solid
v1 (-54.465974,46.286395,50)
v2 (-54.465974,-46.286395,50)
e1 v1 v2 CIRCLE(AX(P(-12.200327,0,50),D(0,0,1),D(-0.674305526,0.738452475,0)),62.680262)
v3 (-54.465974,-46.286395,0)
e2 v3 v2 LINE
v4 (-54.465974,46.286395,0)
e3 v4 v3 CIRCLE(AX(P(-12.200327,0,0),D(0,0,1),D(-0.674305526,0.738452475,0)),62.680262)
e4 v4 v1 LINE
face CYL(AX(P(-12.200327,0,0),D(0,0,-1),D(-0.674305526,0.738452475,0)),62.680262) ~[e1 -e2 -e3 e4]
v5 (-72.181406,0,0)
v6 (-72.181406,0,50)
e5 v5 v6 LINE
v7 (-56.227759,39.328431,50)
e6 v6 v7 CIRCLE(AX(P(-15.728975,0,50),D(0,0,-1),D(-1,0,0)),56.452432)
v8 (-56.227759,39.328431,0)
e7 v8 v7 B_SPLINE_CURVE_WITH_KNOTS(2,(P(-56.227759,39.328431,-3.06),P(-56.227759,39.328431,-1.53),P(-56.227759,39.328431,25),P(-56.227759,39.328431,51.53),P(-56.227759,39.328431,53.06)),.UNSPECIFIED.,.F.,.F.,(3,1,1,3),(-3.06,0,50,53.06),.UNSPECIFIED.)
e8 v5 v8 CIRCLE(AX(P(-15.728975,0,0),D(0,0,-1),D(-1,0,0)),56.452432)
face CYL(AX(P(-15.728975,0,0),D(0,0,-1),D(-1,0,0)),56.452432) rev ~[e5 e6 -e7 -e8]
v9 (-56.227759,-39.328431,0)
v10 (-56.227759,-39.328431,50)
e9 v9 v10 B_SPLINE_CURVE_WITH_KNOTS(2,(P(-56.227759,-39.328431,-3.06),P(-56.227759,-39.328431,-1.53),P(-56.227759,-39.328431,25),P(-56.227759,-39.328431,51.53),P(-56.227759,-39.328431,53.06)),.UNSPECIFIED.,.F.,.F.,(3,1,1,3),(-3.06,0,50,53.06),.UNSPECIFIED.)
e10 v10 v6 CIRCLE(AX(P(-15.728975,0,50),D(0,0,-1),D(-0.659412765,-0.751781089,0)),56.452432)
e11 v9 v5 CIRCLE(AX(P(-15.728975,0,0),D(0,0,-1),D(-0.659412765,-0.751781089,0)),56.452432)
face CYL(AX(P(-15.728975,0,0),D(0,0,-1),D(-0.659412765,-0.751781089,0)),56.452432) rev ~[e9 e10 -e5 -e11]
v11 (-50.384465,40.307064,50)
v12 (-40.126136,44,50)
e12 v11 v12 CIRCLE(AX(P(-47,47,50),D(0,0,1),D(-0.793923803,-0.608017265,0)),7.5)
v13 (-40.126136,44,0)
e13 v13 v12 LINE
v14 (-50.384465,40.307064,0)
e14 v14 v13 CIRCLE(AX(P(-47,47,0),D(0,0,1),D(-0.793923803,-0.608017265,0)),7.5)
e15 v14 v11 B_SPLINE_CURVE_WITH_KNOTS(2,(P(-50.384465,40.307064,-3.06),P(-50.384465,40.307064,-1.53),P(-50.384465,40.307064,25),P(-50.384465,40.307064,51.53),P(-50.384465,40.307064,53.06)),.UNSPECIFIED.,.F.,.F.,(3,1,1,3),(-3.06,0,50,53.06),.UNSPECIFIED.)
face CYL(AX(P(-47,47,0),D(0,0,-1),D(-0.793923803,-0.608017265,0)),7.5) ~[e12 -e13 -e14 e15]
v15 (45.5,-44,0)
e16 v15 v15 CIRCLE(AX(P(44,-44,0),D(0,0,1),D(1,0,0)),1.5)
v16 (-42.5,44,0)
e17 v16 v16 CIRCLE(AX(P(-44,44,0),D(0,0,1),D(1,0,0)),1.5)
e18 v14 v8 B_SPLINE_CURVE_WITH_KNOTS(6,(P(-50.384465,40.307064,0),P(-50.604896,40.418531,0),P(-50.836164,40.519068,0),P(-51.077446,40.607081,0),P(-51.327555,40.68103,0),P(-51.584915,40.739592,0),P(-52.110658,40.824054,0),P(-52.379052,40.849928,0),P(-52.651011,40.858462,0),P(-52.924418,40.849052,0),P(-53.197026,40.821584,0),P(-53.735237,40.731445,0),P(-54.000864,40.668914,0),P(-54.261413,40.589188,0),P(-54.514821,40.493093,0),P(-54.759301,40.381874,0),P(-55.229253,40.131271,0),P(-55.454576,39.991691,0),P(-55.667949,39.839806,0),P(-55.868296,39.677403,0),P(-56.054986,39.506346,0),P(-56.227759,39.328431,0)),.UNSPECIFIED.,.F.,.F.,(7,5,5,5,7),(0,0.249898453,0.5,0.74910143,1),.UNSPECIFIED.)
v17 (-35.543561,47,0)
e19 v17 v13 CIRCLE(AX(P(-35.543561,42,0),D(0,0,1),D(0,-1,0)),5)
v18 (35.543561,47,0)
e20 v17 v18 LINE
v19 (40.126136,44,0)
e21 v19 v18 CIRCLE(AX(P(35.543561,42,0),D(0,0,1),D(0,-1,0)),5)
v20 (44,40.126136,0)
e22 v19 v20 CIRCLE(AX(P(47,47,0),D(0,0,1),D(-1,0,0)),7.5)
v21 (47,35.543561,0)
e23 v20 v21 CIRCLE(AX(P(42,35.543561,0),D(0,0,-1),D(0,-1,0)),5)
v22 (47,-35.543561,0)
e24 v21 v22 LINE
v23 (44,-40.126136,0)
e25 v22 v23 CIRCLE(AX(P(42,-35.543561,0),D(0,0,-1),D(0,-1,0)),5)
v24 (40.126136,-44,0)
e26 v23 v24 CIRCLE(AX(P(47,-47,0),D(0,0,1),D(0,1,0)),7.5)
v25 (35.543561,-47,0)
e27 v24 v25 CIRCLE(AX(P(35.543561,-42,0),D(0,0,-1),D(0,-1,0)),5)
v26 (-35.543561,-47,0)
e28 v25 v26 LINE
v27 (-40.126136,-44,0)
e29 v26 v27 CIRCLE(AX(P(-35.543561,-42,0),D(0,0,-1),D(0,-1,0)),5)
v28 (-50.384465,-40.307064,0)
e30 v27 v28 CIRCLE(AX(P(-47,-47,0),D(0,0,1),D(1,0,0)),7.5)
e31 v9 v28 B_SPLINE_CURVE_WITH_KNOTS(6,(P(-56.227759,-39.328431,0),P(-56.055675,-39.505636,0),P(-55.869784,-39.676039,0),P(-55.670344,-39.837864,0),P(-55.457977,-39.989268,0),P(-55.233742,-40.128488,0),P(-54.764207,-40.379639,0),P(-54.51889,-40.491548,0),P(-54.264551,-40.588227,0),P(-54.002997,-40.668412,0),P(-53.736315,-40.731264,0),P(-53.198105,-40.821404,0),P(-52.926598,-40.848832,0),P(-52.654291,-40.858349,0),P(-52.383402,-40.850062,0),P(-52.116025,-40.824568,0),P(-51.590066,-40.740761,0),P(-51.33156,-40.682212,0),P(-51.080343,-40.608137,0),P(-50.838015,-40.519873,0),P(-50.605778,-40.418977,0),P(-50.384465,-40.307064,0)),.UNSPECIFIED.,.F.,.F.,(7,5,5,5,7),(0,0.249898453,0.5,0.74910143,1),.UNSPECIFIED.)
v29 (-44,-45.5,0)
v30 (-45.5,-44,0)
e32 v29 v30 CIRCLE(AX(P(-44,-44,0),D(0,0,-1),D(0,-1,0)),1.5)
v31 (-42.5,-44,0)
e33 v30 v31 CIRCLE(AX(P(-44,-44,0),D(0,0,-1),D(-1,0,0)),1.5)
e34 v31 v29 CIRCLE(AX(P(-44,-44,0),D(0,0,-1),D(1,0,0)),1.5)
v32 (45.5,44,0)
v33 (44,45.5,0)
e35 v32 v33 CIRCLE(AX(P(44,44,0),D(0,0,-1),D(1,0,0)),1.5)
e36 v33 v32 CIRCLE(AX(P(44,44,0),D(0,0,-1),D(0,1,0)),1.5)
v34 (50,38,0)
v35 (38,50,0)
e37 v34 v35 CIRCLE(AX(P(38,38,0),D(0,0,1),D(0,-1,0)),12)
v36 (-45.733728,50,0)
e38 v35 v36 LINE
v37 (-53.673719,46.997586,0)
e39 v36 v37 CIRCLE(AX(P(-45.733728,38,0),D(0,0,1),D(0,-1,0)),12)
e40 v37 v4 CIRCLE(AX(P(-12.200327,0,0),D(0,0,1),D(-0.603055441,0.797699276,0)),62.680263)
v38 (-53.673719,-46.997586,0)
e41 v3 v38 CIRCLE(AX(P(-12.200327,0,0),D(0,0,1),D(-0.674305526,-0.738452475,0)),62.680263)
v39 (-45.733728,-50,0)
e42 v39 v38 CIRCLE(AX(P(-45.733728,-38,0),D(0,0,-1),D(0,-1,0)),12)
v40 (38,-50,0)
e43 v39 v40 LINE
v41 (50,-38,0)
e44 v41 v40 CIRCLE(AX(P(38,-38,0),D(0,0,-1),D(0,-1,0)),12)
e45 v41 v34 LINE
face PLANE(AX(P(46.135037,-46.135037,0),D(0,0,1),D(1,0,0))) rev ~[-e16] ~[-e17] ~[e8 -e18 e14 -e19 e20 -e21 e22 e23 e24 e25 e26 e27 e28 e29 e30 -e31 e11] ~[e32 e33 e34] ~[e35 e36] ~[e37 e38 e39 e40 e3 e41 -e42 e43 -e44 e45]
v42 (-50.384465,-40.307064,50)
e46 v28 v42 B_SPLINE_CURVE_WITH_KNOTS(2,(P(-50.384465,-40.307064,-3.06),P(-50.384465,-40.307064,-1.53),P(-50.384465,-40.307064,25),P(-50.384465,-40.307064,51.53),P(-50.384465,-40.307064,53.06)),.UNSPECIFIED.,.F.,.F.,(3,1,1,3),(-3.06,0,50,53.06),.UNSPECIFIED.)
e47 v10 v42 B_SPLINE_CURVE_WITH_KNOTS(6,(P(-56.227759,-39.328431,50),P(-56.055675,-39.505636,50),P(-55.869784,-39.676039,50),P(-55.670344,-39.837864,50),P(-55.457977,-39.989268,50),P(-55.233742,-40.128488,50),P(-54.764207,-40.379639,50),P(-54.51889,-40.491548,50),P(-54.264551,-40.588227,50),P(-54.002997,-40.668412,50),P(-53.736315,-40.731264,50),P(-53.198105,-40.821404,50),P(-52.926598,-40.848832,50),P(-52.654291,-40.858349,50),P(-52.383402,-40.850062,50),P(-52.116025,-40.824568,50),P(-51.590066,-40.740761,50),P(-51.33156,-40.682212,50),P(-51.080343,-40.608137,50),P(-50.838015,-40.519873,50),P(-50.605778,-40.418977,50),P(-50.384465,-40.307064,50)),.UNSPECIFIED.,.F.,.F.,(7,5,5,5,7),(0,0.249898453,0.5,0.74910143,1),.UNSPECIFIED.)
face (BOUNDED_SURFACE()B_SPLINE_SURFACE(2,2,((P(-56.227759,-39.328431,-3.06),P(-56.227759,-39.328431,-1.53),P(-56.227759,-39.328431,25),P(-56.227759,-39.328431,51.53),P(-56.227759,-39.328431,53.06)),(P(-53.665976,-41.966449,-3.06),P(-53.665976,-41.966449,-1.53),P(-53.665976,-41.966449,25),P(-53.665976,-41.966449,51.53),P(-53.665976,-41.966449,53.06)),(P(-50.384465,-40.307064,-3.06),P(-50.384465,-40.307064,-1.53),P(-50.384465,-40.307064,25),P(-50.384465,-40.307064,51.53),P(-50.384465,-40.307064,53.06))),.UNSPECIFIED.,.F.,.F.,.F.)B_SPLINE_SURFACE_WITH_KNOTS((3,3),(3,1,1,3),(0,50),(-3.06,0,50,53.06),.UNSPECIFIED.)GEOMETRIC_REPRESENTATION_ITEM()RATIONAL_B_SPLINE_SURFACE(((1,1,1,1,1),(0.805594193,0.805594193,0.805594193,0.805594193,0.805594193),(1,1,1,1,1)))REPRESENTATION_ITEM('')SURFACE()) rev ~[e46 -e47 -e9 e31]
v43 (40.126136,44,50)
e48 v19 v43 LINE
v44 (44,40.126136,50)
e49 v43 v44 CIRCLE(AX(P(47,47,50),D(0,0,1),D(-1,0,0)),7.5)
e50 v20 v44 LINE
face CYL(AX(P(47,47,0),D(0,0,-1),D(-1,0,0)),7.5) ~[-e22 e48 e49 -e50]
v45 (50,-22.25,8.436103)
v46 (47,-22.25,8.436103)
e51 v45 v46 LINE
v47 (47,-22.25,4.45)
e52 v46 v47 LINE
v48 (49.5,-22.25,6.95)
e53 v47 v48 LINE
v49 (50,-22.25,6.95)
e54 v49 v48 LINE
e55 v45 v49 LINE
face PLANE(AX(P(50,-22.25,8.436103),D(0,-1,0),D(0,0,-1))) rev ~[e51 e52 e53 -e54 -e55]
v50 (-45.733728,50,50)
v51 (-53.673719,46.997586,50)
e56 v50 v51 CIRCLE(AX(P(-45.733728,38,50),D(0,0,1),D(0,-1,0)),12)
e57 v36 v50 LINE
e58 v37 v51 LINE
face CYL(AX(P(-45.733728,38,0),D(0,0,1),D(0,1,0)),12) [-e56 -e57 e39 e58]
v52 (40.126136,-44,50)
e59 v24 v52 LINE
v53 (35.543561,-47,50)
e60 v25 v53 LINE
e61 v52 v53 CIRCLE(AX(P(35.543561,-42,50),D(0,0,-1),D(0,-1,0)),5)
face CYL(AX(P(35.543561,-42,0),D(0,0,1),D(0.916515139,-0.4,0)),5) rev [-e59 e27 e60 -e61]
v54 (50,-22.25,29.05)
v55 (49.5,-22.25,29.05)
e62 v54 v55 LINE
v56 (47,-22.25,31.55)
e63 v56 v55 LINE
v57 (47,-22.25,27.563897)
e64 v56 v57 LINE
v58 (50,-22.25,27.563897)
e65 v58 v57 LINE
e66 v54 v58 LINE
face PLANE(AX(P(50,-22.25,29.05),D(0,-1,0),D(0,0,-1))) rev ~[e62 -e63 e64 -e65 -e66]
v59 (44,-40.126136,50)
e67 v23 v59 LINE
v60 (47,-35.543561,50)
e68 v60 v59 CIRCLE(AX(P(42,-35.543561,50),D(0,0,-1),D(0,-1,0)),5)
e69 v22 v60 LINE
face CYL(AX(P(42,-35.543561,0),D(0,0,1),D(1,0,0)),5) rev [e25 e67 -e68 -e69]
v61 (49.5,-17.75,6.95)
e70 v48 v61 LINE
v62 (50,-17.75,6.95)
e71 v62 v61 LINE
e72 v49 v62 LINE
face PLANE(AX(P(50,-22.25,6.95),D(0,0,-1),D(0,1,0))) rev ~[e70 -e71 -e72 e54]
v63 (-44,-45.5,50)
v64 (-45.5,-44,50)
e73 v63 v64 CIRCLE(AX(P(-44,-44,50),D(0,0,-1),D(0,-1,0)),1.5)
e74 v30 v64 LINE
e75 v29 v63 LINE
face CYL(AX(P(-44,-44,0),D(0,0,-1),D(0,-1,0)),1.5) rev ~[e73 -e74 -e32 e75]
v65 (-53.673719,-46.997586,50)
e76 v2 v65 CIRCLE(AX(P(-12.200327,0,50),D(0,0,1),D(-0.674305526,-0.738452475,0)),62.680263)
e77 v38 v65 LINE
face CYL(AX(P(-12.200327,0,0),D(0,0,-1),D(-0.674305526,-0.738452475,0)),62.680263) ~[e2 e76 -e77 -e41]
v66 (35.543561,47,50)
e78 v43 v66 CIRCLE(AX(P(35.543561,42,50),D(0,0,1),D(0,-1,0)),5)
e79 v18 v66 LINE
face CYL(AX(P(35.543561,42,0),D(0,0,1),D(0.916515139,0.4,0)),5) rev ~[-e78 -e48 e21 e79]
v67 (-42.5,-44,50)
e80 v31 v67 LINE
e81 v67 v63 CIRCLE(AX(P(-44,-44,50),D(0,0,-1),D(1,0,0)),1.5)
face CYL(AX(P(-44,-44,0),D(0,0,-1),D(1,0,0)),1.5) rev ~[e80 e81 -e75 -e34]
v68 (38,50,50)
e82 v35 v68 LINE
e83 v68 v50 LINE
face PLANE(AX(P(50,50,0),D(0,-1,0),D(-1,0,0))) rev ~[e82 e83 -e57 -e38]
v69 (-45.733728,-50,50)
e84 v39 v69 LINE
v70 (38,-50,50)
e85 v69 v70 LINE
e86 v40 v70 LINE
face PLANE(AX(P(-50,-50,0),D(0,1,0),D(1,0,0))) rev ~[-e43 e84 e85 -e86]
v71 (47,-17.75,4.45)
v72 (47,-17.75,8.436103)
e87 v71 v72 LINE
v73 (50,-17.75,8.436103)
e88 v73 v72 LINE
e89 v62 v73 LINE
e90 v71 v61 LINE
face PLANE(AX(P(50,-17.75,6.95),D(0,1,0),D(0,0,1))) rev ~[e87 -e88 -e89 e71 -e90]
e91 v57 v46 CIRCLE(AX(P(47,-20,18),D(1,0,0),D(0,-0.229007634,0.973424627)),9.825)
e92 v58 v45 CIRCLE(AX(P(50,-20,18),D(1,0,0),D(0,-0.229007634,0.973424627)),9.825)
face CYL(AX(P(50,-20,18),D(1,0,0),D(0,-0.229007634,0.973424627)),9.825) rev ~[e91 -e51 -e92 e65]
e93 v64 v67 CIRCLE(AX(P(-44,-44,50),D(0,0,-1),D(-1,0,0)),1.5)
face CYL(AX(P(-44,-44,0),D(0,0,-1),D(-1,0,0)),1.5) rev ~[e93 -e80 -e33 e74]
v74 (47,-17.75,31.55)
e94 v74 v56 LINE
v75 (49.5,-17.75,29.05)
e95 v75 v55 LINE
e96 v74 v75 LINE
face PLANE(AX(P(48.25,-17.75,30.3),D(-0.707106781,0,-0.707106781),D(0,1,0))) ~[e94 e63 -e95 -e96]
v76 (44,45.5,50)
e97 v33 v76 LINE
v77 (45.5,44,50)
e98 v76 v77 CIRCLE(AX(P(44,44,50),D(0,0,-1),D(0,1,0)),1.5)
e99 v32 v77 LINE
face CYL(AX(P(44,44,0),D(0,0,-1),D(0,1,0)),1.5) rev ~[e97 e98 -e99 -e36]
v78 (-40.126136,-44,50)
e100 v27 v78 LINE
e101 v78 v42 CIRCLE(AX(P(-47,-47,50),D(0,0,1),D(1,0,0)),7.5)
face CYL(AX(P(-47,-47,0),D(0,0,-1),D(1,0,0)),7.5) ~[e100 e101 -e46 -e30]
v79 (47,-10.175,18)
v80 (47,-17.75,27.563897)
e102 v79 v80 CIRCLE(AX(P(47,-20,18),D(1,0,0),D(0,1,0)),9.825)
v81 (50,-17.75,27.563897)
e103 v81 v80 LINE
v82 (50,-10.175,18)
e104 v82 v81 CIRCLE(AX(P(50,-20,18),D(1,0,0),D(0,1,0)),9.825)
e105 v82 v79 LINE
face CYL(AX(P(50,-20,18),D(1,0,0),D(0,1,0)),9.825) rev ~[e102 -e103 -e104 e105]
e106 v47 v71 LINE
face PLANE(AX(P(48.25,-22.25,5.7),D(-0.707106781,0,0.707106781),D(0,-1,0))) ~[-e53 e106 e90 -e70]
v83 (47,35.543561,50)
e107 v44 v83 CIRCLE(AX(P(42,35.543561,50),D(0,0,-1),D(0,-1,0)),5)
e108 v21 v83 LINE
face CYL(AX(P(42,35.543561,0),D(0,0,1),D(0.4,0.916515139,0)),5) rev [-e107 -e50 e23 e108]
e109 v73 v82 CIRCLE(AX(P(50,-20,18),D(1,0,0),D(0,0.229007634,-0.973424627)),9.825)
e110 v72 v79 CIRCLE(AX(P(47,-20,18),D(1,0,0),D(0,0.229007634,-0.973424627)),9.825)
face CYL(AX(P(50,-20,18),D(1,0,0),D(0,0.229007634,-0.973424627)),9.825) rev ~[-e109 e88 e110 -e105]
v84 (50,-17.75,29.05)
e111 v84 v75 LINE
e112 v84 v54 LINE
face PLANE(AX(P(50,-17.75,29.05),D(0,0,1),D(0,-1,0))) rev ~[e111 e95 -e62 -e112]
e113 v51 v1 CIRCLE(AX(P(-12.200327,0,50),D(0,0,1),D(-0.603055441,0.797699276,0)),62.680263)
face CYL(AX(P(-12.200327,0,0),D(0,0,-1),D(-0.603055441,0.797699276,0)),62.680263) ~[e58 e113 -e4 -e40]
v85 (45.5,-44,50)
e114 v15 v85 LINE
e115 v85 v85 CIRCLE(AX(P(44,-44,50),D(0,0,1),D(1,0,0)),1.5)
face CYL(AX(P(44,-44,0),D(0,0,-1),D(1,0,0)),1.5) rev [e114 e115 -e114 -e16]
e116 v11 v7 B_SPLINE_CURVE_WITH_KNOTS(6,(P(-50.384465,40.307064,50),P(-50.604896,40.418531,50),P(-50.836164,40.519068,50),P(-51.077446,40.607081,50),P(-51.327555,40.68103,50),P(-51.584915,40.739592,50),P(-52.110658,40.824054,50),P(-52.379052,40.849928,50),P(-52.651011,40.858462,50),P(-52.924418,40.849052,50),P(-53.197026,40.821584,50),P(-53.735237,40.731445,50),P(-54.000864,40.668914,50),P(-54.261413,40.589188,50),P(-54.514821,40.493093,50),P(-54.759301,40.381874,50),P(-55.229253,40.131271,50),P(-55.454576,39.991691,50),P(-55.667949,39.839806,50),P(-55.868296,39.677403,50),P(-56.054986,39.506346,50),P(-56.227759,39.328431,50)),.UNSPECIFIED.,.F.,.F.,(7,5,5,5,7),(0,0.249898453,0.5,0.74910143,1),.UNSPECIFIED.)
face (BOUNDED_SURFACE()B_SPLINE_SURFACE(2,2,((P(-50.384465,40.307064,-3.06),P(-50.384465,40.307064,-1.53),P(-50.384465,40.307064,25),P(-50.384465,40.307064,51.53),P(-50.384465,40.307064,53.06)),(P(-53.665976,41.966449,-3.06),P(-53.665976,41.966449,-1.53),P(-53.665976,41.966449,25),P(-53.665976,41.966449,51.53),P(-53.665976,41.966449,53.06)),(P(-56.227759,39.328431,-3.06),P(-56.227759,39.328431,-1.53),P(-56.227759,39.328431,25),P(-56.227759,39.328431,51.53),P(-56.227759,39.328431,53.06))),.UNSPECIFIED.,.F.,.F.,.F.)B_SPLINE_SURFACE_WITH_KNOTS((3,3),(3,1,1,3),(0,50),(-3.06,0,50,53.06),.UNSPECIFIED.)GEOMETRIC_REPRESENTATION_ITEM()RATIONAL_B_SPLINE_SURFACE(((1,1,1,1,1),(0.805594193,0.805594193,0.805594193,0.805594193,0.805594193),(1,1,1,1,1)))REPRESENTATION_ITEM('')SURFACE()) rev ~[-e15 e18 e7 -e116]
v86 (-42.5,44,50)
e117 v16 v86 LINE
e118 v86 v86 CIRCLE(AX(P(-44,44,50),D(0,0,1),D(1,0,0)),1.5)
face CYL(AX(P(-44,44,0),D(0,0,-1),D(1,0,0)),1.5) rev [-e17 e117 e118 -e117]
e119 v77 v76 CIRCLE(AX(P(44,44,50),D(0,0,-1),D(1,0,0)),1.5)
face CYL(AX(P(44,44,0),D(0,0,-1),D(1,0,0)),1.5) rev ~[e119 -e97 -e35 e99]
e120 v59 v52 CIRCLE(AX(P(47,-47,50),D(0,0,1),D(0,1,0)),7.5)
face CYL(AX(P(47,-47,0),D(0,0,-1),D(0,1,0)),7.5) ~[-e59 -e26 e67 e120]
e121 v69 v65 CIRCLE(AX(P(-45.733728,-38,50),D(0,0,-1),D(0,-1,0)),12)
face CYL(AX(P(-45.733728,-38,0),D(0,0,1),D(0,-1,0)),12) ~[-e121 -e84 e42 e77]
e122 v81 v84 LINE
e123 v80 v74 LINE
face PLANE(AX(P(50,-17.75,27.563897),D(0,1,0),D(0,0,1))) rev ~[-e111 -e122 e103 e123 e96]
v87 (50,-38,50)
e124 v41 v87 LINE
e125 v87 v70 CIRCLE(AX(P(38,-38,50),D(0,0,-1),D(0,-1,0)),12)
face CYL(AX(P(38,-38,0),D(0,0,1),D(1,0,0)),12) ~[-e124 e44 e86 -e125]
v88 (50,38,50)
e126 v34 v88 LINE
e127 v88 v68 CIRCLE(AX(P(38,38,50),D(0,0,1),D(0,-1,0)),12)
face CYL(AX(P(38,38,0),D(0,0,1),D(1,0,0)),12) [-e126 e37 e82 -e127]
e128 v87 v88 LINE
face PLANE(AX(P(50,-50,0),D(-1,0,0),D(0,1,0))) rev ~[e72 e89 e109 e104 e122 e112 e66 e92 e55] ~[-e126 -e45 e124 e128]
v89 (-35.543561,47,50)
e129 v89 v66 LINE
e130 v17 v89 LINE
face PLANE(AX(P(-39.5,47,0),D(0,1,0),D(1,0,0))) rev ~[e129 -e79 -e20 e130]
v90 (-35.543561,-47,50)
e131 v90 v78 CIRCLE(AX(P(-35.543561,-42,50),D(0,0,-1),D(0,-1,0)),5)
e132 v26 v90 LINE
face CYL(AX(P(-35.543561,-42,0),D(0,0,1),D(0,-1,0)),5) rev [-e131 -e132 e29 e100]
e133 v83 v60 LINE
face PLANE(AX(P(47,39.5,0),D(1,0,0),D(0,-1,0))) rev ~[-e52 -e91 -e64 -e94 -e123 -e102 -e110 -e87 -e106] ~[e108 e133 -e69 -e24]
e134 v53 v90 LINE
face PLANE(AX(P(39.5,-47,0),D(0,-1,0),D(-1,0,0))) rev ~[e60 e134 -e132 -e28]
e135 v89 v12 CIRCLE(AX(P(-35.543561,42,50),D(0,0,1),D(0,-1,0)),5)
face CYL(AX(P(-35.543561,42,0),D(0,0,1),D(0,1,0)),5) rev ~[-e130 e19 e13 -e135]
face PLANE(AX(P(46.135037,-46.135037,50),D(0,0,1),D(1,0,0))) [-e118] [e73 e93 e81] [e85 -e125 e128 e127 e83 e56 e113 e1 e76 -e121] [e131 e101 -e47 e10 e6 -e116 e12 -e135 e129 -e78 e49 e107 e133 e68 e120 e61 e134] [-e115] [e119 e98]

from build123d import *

# Parameters (mm, degrees)
F0_R     = 1.5
F1_DEPTH = 50
F2_R     = 12
F3_R     = 5
F5_DEPTH = 4
F6_SIZE  = 2.5


with BuildPart() as f1:
    # F0 (on Top) → F1 (new body)
    with BuildSketch(Plane.XY):
        with BuildLine():
            Line((40.1261364576, -50), (50, -50))
            Line((50, -50), (50, -40.1261364576))
            ThreePointArc((50, -40.1261364576), (48.5323223277, -39.658202653), (47, -39.5))
            Line((47, -39.5), (47, -47))
            Line((47, -47), (39.5, -47))
            ThreePointArc((39.5, -47), (39.658202653, -48.5323223277), (40.1261364576, -50))
        make_face()
        with BuildLine():
            Line((-40.1261364576, -50), (40.1261364576, -50))
            ThreePointArc((40.1261364576, -50), (39.658202653, -48.5323223277), (39.5, -47))
            Line((39.5, -47), (-39.5, -47))
            ThreePointArc((-39.5, -47), (-39.658202653, -48.5323223277), (-40.1261364576, -50))
        make_face()
        with BuildLine():
            ThreePointArc((47, -39.5), (48.5323223277, -39.658202653), (50, -40.1261364576))
            Line((50, -40.1261364576), (50, 40.1261364576))
            ThreePointArc((50, 40.1261364576), (48.5323223277, 39.658202653), (47, 39.5))
            Line((47, 39.5), (47, -39.5))
        make_face()
        with BuildLine():
            Line((-50, -50), (-40.1261364576, -50))
            ThreePointArc((-40.1261364576, -50), (-39.658202653, -48.5323223277), (-39.5, -47))
            Line((-39.5, -47), (-44, -47))
            Line((-44, -47), (-47, -47))
            ThreePointArc((-47, -47), (-50.0530276117, -44.8189291928), (-52.9544285232, -42.4398705103))
            ThreePointArc((-52.9544285232, -42.4398705103), (-53.9803824114, -44.2569612852), (-54.4659740059, -46.2863949669))
            ThreePointArc((-54.4659740059, -46.2863949669), (-52.2760251532, -48.1949550771), (-50, -50))
        make_face()
        with BuildLine():
            ThreePointArc((47, -39.5), (41.6966991411, -41.6966991411), (39.5, -47))
            Line((39.5, -47), (47, -47))
            Line((47, -47), (47, -39.5))
        make_face()
        with Locations((44, -44)):
            Circle(F0_R, mode=Mode.SUBTRACT)
        with BuildLine():
            ThreePointArc((47, 39.5), (48.5323223277, 39.658202653), (50, 40.1261364576))
            Line((50, 40.1261364576), (50, 50))
            Line((50, 50), (40.1261364576, 50))
            ThreePointArc((40.1261364576, 50), (39.658202653, 48.5323223277), (39.5, 47))
            Line((39.5, 47), (44, 47))
            Line((44, 47), (47, 47))
            Line((47, 47), (47, 44))
            Line((47, 44), (47, 39.5))
        make_face()
        with BuildLine():
            ThreePointArc((-54.4659740059, 46.2863949669), (-74.8805891399, 0), (-54.4659740059, -46.2863949669))
            ThreePointArc((-54.4659740059, -46.2863949669), (-53.9803824114, -44.2569612852), (-52.9544285232, -42.4398705103))
            ThreePointArc((-52.9544285232, -42.4398705103), (-67.1504896249, -23.2960258249), (-72.1814061329, 0))
            ThreePointArc((-72.1814061329, 0), (-67.1504896249, 23.2960258249), (-52.9544285232, 42.4398705103))
            ThreePointArc((-52.9544285232, 42.4398705103), (-53.9803824114, 44.2569612852), (-54.4659740059, 46.2863949669))
        make_face()
        with BuildLine():
            Line((-44, -47), (-39.5, -47))
            ThreePointArc((-39.5, -47), (-44.5925338968, -39.8968945551), (-52.9544285232, -42.4398705103))
            ThreePointArc((-52.9544285232, -42.4398705103), (-50.0530276117, -44.8189291928), (-47, -47))
            Line((-47, -47), (-44, -47))
        make_face()
        with BuildLine():
            ThreePointArc((-42.5, -44), (-42.9393398282, -45.0606601718), (-44, -45.5))
            ThreePointArc((-44, -45.5), (-45.0606601718, -45.0606601718), (-45.5, -44))
            ThreePointArc((-45.5, -44), (-44, -42.5), (-42.5, -44))
        make_face(mode=Mode.SUBTRACT)
        with BuildLine():
            ThreePointArc((39.5, 47), (41.6966991411, 41.6966991411), (47, 39.5))
            Line((47, 39.5), (47, 44))
            Line((47, 44), (45.5, 44))
            ThreePointArc((45.5, 44), (42.9393398282, 42.9393398282), (44, 45.5))
            Line((44, 45.5), (44, 47))
            Line((44, 47), (39.5, 47))
        make_face()
        with BuildLine():
            ThreePointArc((-50, 50), (-52.2760251532, 48.1949550771), (-54.4659740059, 46.2863949669))
            ThreePointArc((-54.4659740059, 46.2863949669), (-53.9803824114, 44.2569612852), (-52.9544285232, 42.4398705103))
            ThreePointArc((-52.9544285232, 42.4398705103), (-50.0530276117, 44.8189291928), (-47, 47))
            Line((-47, 47), (-39.5, 47))
            ThreePointArc((-39.5, 47), (-39.658202653, 48.5323223277), (-40.1261364576, 50))
            Line((-40.1261364576, 50), (-50, 50))
        make_face()
        with BuildLine():
            ThreePointArc((39.5, 47), (39.658202653, 48.5323223277), (40.1261364576, 50))
            Line((40.1261364576, 50), (-40.1261364576, 50))
            ThreePointArc((-40.1261364576, 50), (-39.658202653, 48.5323223277), (-39.5, 47))
            Line((-39.5, 47), (39.5, 47))
        make_face()
        with BuildLine():
            Line((45.5, 44), (47, 44))
            Line((47, 44), (47, 47))
            Line((47, 47), (44, 47))
            Line((44, 47), (44, 45.5))
            ThreePointArc((44, 45.5), (45.0606601718, 45.0606601718), (45.5, 44))
        make_face()
        with BuildLine():
            ThreePointArc((-47, 47), (-50.0530276117, 44.8189291928), (-52.9544285232, 42.4398705103))
            ThreePointArc((-52.9544285232, 42.4398705103), (-44.5925338968, 39.8968945551), (-39.5, 47))
            Line((-39.5, 47), (-47, 47))
        make_face()
        with Locations((-44, 44)):
            Circle(F0_R, mode=Mode.SUBTRACT)
    extrude(amount=F1_DEPTH)

    # F2
    f2_edges = [f1.edges().sort_by_distance(p)[0] for p in [
        (-50, 50, 25),
        (50, 50, 25),
        (50, -50, 25),
        (-50, -50, 25),
    ]]
    fillet(f2_edges, radius=F2_R)

    # F3
    f3_edges = [f1.edges().sort_by_distance(p)[0] for p in [
        (-39.5, -47, 25),
        (39.5, -47, 25),
        (47, -39.5, 25),
        (39.5, 47, 25),
        (47, 39.5, 25),
        (-39.5, 47, 25),
        (-52.954429, -42.439871, 25),
        (-52.954429, 42.439871, 25),
    ]]
    fillet(f3_edges, radius=F3_R)

    # F4 (on face) → F5 (cut)
    with BuildSketch(Plane.YZ.offset(50)):
        with BuildLine():
            Line((-22.25, 8.4361030432), (-22.25, 27.5638969568))
            ThreePointArc((-22.25, 27.5638969568), (-29.825, 18), (-22.25, 8.4361030432))
        make_face()
        with BuildLine():
            Line((-17.75, 8.4361030432), (-17.75, 27.5638969568))
            ThreePointArc((-17.75, 27.5638969568), (-20, 27.825), (-22.25, 27.5638969568))
            Line((-22.25, 27.5638969568), (-22.25, 8.4361030432))
            ThreePointArc((-22.25, 8.4361030432), (-20, 8.175), (-17.75, 8.4361030432))
        make_face()
        with BuildLine():
            ThreePointArc((-17.75, 8.4361030432), (-12.2981536305, 11.8998206994), (-10.175, 18))
            ThreePointArc((-10.175, 18), (-12.2981536305, 24.1001793006), (-17.75, 27.5638969568))
            Line((-17.75, 27.5638969568), (-17.75, 8.4361030432))
        make_face()
        with BuildLine():
            ThreePointArc((-22.25, 27.5638969568), (-20, 27.825), (-17.75, 27.5638969568))
            Line((-17.75, 27.5638969568), (-17.75, 29.05))
            Line((-17.75, 29.05), (-22.25, 29.05))
            Line((-22.25, 29.05), (-22.25, 27.5638969568))
        make_face()
        with BuildLine():
            Line((-17.75, 6.95), (-17.75, 8.4361030432))
            ThreePointArc((-17.75, 8.4361030432), (-20, 8.175), (-22.25, 8.4361030432))
            Line((-22.25, 8.4361030432), (-22.25, 6.95))
            Line((-22.25, 6.95), (-17.75, 6.95))
        make_face()
    extrude(amount=-F5_DEPTH, mode=Mode.SUBTRACT)

    # F6
    f6_edges = [f1.edges().sort_by_distance(p)[0] for p in [
        (47, -20, 29.05),
        (47, -20, 6.95),
    ]]
    chamfer(f6_edges, length=F6_SIZE)


solid = f1.part
